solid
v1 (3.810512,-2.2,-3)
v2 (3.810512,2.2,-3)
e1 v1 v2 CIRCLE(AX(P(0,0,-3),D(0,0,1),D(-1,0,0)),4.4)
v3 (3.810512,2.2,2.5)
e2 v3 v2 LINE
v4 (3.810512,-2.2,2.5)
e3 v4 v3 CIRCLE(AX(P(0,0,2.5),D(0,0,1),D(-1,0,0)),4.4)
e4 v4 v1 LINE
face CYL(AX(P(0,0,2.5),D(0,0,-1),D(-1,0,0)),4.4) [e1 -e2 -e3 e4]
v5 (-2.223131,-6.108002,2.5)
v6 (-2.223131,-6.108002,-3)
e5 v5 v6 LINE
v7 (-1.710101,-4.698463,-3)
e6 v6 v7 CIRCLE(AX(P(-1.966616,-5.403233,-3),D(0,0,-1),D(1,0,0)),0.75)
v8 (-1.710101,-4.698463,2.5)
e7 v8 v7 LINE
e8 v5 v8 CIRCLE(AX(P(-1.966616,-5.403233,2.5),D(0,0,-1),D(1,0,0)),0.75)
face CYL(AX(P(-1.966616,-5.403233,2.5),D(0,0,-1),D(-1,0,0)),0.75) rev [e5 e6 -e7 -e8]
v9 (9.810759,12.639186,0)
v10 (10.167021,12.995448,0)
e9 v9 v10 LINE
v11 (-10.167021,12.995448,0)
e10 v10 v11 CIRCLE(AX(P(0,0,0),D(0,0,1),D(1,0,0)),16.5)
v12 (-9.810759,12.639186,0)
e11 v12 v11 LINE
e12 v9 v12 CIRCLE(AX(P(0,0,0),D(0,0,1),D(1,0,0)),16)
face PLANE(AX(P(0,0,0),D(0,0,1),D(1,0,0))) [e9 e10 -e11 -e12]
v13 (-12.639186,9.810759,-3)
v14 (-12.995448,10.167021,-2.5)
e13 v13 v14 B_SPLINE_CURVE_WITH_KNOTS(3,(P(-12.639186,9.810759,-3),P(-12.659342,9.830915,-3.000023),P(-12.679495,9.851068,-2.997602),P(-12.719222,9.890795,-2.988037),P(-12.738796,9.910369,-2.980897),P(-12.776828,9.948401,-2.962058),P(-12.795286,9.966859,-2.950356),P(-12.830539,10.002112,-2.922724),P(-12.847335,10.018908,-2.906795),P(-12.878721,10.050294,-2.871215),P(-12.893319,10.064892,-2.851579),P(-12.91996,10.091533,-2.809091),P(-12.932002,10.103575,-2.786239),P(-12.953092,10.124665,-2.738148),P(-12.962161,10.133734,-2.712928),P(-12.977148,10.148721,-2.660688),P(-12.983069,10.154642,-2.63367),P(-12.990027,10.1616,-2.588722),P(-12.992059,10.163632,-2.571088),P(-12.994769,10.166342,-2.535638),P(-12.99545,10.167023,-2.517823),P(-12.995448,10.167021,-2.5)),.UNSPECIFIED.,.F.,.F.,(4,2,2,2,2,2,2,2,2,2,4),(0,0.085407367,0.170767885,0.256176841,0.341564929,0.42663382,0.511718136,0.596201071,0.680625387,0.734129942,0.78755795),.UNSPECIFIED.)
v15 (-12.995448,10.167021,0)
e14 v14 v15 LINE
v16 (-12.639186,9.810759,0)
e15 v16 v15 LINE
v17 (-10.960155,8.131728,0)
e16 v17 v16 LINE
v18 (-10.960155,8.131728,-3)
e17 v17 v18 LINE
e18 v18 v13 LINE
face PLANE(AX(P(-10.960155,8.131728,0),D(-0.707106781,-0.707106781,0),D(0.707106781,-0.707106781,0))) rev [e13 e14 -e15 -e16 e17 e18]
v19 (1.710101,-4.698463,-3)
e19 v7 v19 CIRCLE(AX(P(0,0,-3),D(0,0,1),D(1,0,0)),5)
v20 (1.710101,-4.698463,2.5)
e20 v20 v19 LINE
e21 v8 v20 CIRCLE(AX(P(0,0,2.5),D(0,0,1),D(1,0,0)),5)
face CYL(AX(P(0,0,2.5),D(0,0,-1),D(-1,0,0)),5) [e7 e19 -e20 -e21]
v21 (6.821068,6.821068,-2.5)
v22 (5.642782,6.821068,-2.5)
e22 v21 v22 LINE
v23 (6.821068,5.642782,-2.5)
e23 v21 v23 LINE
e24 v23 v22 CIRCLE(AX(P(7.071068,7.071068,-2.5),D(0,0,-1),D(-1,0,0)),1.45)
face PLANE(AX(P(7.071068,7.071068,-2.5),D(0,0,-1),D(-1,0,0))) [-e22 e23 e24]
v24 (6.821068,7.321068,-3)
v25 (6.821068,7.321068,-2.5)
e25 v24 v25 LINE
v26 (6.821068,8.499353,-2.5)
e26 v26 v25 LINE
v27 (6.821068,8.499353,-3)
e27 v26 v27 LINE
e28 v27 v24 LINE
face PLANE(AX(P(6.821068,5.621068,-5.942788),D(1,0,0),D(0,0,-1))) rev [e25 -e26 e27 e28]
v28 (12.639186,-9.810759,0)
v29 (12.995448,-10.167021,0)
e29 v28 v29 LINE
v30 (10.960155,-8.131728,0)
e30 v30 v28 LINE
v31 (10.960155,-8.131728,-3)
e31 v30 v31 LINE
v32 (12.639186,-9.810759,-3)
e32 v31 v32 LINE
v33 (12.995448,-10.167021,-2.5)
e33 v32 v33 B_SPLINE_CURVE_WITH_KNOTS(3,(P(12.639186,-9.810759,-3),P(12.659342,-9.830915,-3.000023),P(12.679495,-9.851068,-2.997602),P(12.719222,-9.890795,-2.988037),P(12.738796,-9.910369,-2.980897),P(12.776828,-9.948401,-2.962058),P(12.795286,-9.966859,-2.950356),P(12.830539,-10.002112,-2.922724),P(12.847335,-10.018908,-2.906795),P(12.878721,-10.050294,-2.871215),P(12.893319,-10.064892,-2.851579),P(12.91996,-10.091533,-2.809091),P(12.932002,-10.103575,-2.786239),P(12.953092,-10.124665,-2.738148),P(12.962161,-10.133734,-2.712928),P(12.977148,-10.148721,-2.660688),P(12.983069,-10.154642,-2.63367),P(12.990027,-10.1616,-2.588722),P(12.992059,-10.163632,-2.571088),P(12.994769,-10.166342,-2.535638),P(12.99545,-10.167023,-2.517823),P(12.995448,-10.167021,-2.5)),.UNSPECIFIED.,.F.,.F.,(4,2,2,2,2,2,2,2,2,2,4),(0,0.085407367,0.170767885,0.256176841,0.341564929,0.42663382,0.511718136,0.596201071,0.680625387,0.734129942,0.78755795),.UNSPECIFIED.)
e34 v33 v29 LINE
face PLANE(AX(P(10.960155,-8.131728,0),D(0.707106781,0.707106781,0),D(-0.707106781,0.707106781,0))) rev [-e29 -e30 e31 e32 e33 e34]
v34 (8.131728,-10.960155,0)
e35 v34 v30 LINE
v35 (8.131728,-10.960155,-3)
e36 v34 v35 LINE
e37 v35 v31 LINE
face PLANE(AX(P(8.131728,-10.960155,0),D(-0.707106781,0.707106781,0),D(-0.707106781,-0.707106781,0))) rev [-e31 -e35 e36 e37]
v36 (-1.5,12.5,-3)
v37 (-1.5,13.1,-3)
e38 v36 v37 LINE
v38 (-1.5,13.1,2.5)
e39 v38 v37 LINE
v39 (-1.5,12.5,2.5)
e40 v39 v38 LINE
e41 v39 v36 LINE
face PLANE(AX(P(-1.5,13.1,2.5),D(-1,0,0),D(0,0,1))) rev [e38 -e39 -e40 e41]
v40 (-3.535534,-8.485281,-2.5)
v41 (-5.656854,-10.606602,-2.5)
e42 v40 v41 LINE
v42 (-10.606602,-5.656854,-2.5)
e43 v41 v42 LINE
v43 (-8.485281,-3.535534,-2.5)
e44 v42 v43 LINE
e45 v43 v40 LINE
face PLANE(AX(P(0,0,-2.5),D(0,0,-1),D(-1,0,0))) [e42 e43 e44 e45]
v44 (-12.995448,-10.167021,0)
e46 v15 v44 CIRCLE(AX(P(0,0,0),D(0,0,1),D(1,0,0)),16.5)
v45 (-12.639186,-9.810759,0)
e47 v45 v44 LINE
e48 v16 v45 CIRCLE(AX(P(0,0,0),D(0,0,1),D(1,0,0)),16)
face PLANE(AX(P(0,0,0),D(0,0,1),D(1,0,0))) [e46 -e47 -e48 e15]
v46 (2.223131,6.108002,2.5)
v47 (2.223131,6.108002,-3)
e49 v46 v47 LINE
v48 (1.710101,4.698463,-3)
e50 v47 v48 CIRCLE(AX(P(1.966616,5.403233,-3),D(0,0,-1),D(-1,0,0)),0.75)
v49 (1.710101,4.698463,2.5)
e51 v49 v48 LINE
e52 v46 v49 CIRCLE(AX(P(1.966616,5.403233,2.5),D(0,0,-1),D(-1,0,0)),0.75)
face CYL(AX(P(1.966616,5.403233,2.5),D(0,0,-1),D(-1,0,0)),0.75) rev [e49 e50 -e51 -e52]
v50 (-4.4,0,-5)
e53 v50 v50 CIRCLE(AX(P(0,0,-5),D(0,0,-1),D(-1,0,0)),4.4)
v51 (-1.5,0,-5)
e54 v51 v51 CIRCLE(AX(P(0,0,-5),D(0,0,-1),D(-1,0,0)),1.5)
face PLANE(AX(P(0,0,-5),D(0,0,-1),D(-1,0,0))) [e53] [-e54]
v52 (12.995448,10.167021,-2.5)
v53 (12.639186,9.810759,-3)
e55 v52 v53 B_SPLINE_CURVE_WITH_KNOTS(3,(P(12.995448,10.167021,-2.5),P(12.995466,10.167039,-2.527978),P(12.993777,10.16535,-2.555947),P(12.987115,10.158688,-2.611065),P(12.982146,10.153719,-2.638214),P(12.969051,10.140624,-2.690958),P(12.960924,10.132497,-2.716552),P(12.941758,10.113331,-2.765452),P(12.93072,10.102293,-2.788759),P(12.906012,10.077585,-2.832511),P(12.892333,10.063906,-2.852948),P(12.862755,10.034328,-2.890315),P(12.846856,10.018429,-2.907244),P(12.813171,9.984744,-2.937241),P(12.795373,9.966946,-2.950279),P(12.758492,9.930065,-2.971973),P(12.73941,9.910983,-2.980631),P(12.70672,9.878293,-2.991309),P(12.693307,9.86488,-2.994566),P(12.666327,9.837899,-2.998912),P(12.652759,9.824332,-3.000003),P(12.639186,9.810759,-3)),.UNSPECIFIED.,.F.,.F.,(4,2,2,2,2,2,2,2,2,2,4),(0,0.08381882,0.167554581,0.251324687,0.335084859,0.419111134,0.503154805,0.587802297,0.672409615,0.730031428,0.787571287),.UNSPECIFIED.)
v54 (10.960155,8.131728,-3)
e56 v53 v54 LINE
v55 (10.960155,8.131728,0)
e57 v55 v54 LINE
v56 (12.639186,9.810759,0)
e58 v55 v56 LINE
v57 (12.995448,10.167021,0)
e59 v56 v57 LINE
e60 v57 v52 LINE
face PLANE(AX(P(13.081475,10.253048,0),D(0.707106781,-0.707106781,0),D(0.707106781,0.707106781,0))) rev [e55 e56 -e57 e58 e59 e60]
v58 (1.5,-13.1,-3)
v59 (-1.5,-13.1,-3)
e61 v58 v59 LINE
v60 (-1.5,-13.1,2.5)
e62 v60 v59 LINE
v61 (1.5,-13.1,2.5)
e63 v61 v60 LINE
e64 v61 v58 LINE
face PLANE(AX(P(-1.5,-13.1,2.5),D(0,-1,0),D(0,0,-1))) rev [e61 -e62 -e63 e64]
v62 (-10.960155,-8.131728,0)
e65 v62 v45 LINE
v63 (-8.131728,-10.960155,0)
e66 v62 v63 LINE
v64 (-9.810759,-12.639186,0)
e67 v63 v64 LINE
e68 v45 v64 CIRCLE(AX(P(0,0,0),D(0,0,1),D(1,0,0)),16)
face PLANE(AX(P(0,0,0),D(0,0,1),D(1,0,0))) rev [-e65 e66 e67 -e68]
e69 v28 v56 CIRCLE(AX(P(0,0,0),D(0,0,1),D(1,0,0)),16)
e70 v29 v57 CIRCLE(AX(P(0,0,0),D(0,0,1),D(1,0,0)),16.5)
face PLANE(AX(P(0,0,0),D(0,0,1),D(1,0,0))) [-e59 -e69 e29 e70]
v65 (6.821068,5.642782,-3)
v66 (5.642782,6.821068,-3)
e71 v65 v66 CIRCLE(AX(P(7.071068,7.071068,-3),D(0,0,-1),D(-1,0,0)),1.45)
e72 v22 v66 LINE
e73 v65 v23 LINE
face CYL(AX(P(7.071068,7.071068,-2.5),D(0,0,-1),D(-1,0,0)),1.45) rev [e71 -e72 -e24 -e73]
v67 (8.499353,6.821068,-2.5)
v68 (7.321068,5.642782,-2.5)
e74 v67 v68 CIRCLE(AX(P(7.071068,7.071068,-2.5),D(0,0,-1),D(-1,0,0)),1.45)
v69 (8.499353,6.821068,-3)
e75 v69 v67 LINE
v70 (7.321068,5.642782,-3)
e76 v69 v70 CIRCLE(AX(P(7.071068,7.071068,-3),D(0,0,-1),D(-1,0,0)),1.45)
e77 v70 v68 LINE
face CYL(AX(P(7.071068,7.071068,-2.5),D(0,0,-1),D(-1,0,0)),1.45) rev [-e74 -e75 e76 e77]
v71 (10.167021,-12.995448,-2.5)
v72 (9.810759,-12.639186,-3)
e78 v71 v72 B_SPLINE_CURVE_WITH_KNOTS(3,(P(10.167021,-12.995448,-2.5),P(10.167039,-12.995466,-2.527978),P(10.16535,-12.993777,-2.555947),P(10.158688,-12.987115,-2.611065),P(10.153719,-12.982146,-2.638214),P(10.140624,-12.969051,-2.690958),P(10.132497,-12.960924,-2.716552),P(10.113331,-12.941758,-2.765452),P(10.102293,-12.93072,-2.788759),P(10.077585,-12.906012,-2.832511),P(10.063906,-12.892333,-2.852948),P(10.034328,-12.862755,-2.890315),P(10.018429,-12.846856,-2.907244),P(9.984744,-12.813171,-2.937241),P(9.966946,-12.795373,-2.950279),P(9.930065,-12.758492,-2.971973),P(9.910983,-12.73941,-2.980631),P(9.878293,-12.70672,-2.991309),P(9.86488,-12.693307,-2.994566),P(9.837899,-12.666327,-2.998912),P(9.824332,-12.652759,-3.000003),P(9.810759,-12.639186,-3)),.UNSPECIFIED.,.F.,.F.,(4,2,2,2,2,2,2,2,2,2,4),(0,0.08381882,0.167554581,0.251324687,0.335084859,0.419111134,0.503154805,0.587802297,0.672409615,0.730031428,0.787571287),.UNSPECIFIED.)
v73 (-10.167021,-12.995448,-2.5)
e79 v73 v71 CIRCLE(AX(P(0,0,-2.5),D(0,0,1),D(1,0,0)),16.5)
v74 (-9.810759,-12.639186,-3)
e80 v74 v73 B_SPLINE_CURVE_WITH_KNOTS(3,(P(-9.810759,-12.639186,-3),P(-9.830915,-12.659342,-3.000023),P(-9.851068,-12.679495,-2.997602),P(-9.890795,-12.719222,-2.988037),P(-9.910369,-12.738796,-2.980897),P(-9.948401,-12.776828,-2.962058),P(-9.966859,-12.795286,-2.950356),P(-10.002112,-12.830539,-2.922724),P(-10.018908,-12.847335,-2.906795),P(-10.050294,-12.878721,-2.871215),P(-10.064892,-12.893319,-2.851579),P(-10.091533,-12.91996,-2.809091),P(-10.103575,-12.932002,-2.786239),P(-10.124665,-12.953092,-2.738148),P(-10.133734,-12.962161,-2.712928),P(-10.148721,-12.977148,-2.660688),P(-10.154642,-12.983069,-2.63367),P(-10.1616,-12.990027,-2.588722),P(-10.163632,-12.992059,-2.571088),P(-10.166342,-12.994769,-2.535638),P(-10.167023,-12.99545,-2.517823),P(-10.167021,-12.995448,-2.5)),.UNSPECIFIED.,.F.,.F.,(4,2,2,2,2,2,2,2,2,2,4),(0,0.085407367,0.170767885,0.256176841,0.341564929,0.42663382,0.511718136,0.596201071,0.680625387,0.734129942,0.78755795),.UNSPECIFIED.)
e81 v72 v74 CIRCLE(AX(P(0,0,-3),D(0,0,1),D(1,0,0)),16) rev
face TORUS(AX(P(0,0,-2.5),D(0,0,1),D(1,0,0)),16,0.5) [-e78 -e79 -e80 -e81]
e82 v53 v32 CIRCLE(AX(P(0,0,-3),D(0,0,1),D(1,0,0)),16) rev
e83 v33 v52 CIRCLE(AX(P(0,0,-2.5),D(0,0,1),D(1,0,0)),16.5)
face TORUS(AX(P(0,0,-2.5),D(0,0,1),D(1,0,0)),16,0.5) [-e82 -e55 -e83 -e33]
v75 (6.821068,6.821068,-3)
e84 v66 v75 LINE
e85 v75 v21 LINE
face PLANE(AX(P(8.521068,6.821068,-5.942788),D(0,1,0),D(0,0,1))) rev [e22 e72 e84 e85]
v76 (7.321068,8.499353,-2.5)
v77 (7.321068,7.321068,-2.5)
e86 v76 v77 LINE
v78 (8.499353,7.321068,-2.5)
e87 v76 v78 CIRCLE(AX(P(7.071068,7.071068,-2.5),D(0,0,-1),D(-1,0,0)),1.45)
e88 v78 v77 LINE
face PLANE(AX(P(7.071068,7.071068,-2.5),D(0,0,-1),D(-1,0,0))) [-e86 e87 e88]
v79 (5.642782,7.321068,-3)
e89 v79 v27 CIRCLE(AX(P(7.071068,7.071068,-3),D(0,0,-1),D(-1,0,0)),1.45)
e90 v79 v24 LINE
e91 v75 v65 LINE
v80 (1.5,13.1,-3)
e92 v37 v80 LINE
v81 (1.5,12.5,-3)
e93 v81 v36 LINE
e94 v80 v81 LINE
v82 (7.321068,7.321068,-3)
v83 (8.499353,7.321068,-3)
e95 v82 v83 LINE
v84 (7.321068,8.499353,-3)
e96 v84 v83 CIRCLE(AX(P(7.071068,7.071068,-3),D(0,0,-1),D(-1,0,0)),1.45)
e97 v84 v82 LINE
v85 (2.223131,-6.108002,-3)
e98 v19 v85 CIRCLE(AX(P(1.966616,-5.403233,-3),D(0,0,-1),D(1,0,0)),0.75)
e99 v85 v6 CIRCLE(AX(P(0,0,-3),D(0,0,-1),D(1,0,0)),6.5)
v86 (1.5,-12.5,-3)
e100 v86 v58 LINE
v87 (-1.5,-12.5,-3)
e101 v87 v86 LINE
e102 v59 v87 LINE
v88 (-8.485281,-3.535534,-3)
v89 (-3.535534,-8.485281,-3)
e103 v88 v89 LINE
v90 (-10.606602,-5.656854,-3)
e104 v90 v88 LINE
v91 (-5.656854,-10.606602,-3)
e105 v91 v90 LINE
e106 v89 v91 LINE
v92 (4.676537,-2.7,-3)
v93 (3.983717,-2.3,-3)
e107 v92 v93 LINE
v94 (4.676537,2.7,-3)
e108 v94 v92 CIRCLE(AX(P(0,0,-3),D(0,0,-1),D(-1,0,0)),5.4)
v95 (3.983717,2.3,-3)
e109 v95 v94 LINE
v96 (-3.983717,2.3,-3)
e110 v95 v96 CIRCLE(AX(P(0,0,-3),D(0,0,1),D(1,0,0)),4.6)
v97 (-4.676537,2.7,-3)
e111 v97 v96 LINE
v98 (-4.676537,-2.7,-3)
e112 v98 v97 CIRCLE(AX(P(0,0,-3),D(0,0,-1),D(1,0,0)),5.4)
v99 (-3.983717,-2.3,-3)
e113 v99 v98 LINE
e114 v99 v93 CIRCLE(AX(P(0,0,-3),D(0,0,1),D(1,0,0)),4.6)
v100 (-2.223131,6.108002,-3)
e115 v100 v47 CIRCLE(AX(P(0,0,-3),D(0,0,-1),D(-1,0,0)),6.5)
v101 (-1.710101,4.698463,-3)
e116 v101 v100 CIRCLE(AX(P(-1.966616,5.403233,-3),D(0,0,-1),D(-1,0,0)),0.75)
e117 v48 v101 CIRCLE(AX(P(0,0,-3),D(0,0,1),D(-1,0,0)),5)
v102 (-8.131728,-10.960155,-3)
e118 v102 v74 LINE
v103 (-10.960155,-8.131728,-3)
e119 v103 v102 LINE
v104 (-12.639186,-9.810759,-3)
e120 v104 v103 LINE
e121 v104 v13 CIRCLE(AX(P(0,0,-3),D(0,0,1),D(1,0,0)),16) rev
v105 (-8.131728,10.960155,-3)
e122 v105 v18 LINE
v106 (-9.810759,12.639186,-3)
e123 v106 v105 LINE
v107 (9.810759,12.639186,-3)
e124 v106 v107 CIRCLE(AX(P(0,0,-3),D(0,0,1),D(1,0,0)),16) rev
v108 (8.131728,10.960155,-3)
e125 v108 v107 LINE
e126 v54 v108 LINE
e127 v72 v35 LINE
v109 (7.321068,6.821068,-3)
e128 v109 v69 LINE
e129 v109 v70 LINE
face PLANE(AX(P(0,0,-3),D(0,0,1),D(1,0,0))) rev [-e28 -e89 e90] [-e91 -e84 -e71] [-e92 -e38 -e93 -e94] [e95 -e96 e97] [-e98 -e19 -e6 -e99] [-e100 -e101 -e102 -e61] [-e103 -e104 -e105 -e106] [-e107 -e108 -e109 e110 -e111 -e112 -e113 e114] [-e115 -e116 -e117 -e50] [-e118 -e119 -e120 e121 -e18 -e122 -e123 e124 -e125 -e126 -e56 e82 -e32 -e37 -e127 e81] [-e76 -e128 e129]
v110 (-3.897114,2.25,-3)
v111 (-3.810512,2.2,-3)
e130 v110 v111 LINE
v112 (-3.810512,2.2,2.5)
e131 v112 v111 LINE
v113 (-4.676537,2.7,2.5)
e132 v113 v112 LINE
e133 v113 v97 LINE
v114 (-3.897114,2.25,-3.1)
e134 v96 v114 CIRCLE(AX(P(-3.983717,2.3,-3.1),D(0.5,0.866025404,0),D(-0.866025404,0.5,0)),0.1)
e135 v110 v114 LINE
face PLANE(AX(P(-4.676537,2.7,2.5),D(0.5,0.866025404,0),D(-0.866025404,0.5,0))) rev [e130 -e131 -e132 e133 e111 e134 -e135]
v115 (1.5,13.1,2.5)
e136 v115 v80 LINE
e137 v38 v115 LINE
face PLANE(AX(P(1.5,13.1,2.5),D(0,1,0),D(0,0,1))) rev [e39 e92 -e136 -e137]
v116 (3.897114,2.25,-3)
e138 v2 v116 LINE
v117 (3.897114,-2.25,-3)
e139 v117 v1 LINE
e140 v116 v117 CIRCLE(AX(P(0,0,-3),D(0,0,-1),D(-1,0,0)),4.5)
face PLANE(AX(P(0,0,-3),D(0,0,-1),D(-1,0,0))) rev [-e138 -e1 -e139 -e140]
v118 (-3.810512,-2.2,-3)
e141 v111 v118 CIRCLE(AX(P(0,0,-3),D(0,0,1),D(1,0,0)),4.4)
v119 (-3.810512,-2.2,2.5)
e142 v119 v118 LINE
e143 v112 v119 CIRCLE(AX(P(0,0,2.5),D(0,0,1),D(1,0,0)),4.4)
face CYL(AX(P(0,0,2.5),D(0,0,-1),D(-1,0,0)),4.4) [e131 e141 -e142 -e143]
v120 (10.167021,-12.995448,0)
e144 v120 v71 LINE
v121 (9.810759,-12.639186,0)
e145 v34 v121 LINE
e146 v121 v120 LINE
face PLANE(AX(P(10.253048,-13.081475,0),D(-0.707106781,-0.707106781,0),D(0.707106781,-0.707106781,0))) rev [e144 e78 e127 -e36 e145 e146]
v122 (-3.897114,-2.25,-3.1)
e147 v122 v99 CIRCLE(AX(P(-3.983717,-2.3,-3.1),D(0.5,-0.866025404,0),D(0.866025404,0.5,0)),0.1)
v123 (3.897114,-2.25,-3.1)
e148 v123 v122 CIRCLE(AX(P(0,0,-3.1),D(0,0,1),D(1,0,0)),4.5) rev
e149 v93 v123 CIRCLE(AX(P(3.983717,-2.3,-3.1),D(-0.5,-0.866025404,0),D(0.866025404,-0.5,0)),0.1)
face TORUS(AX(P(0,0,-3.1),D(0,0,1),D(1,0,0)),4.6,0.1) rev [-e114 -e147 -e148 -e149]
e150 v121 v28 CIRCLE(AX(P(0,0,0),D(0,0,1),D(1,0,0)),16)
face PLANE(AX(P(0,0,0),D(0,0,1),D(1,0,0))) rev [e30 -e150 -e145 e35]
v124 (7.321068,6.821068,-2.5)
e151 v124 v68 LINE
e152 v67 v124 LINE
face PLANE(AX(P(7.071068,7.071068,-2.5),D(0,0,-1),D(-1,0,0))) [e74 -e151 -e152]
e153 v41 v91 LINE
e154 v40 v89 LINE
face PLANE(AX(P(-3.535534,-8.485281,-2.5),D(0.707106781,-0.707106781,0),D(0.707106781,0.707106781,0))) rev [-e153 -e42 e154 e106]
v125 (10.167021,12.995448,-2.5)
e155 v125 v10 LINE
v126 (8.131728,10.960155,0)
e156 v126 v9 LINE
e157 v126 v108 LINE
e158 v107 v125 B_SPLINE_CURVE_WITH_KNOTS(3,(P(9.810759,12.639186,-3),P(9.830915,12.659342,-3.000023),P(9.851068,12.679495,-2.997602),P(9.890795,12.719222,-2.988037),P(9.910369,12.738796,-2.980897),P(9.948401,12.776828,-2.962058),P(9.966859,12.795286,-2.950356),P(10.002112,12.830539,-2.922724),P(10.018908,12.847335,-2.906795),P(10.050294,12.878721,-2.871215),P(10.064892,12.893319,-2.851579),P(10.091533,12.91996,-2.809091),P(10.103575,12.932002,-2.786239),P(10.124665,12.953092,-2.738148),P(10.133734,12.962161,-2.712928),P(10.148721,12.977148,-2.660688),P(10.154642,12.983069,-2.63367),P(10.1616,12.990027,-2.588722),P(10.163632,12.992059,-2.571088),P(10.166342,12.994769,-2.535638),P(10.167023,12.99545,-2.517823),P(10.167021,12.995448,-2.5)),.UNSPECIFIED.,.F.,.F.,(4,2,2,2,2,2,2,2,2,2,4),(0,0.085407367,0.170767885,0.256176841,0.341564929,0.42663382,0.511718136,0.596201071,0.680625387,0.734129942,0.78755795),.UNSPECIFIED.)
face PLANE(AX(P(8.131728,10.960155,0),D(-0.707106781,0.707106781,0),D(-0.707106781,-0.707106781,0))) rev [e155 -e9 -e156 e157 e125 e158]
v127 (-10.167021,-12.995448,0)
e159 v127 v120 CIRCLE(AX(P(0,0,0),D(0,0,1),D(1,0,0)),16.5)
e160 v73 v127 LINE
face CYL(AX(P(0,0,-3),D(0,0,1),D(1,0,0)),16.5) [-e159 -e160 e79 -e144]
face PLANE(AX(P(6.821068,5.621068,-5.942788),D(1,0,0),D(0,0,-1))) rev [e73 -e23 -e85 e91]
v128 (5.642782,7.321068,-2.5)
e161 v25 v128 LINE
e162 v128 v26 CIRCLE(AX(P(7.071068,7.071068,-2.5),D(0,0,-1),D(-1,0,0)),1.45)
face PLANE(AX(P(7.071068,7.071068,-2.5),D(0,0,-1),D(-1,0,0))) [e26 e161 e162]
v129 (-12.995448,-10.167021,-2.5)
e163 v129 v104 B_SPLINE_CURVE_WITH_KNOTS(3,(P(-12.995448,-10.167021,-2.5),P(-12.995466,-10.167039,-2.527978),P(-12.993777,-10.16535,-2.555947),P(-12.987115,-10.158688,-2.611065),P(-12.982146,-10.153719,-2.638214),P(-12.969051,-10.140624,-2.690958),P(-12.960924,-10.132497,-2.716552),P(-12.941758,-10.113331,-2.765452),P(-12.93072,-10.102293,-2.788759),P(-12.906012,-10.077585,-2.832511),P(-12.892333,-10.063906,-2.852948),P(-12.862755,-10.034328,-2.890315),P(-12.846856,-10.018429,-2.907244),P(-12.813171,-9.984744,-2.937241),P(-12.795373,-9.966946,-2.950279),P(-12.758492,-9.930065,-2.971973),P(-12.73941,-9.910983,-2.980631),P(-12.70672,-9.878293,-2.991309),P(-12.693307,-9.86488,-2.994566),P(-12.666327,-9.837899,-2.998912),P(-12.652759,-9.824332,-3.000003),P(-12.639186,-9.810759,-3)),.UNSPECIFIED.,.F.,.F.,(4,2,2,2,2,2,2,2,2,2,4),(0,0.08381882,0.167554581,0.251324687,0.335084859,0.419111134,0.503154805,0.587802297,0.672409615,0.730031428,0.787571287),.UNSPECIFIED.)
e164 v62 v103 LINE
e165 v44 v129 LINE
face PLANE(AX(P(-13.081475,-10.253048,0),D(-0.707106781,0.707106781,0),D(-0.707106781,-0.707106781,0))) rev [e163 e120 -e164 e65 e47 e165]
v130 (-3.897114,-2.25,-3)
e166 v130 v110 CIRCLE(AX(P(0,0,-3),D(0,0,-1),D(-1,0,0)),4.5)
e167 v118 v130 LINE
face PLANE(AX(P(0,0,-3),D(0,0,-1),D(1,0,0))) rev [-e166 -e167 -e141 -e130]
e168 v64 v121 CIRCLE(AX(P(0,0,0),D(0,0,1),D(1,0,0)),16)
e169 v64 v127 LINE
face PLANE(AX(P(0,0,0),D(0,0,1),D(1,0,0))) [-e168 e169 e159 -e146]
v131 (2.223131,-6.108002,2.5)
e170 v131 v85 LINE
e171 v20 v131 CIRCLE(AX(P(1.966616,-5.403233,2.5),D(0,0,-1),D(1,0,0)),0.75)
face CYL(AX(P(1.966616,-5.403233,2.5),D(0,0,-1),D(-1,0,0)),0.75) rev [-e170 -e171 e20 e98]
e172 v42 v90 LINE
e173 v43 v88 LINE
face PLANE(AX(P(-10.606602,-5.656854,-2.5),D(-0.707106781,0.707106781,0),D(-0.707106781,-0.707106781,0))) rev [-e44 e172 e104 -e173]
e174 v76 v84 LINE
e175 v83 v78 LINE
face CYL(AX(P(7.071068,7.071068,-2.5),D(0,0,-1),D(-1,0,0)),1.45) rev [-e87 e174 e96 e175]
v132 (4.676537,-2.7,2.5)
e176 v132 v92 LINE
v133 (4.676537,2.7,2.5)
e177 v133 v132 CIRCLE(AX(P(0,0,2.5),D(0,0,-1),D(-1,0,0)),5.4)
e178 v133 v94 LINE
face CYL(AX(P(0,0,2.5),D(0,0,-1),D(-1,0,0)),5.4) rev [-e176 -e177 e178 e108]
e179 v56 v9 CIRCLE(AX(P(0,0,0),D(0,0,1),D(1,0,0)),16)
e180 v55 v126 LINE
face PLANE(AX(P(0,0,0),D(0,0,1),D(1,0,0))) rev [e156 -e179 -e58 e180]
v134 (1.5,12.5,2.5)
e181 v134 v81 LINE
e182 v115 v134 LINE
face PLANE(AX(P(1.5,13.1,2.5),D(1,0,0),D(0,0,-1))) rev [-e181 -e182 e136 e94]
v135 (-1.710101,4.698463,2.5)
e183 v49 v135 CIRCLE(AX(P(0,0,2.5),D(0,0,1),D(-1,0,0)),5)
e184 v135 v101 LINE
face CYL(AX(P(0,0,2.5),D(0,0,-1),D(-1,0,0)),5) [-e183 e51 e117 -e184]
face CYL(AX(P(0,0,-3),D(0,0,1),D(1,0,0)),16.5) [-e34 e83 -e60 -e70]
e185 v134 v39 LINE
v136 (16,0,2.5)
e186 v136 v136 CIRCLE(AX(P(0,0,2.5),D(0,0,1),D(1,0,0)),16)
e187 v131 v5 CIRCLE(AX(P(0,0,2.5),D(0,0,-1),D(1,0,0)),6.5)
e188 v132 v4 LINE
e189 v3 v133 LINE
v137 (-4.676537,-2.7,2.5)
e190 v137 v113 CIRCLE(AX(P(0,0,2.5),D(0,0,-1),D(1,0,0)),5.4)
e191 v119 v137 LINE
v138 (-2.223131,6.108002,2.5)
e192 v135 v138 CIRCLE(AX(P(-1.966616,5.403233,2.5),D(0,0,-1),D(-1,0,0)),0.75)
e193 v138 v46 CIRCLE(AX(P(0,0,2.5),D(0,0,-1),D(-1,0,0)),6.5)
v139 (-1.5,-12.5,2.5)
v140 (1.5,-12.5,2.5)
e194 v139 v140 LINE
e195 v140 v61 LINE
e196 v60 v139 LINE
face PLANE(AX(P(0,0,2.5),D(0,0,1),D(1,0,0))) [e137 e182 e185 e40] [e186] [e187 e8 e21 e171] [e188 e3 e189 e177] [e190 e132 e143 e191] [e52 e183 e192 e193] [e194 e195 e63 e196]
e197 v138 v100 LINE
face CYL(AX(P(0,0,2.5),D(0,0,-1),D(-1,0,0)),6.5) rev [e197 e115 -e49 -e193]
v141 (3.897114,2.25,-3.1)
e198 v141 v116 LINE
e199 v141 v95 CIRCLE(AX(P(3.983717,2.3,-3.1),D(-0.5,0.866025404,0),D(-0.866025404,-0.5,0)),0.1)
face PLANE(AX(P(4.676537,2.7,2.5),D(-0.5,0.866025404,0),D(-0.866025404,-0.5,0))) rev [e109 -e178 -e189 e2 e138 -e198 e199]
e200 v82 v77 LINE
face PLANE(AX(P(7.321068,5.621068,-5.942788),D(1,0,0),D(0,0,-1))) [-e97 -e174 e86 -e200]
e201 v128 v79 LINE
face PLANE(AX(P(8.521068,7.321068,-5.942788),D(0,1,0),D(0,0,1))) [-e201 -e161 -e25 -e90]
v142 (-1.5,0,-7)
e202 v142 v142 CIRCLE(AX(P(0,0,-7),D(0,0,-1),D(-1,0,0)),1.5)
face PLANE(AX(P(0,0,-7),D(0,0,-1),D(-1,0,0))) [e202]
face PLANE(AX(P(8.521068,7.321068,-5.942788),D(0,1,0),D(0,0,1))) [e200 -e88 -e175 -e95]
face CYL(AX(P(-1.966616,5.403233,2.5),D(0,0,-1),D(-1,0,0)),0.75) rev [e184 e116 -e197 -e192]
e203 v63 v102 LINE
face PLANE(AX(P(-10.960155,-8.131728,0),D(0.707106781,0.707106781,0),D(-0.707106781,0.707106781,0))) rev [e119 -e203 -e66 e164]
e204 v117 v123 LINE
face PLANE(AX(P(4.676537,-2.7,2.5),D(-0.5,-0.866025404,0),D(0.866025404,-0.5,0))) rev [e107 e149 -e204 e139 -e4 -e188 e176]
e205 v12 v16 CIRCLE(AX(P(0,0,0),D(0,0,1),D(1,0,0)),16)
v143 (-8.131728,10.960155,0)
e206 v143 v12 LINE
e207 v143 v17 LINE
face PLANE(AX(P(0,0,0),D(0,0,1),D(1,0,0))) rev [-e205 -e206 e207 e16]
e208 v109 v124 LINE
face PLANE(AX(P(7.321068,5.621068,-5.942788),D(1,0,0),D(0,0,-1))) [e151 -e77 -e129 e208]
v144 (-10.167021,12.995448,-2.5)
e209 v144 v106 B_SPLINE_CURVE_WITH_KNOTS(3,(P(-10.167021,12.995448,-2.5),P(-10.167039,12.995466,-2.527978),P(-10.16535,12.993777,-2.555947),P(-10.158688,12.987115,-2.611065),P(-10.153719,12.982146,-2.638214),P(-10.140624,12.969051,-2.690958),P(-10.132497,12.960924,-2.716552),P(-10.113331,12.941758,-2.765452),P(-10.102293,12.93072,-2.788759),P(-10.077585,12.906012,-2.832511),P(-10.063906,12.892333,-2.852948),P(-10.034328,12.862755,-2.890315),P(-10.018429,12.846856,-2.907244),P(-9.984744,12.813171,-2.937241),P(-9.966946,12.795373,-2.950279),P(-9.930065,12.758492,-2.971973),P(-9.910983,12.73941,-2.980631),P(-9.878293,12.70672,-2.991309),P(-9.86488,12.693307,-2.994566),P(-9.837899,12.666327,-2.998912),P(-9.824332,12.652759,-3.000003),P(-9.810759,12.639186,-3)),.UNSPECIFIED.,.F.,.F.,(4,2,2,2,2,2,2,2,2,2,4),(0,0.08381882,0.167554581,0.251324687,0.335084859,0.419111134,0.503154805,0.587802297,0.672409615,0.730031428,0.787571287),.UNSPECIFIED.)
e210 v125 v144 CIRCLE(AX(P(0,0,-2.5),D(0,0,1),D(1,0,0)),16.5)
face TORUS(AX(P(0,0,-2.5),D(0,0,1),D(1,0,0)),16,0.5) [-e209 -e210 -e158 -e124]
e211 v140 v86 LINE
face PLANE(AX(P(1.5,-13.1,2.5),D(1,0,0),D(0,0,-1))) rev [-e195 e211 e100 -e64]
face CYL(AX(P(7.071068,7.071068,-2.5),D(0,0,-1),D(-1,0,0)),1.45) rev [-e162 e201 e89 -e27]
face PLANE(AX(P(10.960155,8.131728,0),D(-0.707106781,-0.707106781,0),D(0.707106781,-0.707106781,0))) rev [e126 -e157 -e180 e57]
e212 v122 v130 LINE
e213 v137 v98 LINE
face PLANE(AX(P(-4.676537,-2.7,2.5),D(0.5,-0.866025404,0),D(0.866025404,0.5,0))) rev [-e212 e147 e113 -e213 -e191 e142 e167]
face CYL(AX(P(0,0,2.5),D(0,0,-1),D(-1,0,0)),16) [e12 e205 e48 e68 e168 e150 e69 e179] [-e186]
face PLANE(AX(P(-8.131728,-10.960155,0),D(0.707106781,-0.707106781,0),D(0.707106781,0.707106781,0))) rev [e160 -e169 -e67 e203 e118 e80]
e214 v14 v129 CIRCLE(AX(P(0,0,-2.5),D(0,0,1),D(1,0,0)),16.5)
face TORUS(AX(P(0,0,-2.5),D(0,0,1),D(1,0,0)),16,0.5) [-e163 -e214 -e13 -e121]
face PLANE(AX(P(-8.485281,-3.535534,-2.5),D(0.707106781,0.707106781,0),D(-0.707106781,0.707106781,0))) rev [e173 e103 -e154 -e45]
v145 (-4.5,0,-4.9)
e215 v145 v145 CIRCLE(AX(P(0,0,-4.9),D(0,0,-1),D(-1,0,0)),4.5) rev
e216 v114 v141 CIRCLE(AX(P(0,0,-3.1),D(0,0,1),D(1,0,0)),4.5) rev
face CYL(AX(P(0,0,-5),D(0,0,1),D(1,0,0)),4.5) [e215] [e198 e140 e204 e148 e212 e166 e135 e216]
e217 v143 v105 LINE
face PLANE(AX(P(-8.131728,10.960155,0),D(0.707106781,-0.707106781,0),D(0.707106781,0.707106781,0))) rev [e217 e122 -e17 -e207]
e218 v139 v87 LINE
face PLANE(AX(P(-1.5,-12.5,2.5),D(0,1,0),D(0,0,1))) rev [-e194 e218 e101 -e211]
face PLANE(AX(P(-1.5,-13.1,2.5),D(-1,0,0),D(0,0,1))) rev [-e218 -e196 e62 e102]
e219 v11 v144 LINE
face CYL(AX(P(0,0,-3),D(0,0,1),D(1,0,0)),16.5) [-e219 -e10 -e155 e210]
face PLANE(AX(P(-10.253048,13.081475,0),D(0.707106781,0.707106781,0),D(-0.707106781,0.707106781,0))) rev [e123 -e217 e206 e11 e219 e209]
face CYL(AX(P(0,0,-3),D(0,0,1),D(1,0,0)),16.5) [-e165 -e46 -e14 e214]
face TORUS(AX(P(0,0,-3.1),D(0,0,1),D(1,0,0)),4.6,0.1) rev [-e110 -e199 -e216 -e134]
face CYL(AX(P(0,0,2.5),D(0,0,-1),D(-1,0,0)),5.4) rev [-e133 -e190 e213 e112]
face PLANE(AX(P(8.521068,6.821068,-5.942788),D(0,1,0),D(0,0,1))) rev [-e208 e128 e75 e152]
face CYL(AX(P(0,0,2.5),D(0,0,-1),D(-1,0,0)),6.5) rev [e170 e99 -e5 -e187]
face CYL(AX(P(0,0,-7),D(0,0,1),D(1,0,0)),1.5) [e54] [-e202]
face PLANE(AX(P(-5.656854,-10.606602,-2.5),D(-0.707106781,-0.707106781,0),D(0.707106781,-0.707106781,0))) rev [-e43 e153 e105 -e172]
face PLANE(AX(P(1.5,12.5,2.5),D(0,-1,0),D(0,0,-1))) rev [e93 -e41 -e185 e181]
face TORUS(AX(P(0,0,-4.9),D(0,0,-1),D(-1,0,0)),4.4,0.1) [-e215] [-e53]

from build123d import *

# Parameters (mm, degrees)
SKETCH1_R           = 16.5
BOSS_EXTRUDE1_DEPTH = 3
SKETCH2_R           = 4.5
BOSS_EXTRUDE2_DEPTH = 2
CUT_EXTRUDE1_DEPTH  = 24.526580712
CIRPATTERN1_COUNT   = 4
SKETCH4_R           = 16
BOSS_EXTRUDE3_DEPTH = 2.5
CUT_EXTRUDE2_DEPTH  = 24.973944189
CIRPATTERN2_COUNT   = 2
CUT_EXTRUDE3_DEPTH  = 24.973944189
CIRPATTERN3_COUNT   = 2
SKETCH8_R           = 1.45
CUT_EXTRUDE4_DEPTH  = 0.5
SKETCH9_W           = 0.5
SKETCH9_H           = 2.9
EXTRUDE_THIN1_DEPTH = 0.5
SKETCH10_W          = 2.9
SKETCH10_H          = 0.5
EXTRUDE_THIN2_DEPTH = 0.5
SKETCH11_W          = 3
SKETCH11_H          = 0.6
CUT_EXTRUDE5_DEPTH  = 24.973944189
CIRPATTERN4_COUNT   = 2
FILLET1_R           = 0.1
FILLET2_R           = 0.5
SKETCH_1_R          = 1.5
EXTRUDE_1_DEPTH     = 2


with BuildPart() as part:
    # Sketch1 → Boss-Extrude1 (new body)
    with BuildSketch(Plane.XY):
        Circle(SKETCH1_R)
    extrude(amount=-BOSS_EXTRUDE1_DEPTH)

    # Sketch2 → Boss-Extrude2 (add)
    with BuildSketch(Plane(origin=(0, 0, -3), x_dir=(-1, 0, 0), z_dir=(0, 0, -1))):
        Circle(SKETCH2_R)
    extrude(amount=BOSS_EXTRUDE2_DEPTH)

    # Sketch3 → Cut-Extrude1 (cut, through all)
    with BuildSketch(Plane(origin=(0, 0, -3), x_dir=(-1, 0, 0), z_dir=(0, 0, -1))):
        Polygon((10.253048327, 13.081475452), (8.131727984, 10.960155108), (10.960155108, 8.131727984), (13.081475452, 10.253048327), align=None)
    cut_extrude1 = extrude(amount=-CUT_EXTRUDE1_DEPTH, mode=Mode.SUBTRACT)

    # CirPattern1: Cut-Extrude1 ×4 about axis
    cirpattern1_axis = Axis((0, 0, 0), (0, 0, 1))
    for i in range(1, CIRPATTERN1_COUNT):
        add(cut_extrude1.rotate(cirpattern1_axis, i * 360 / CIRPATTERN1_COUNT), mode=Mode.SUBTRACT)

    # Sketch4 → Boss-Extrude3 (add)
    with BuildSketch(Plane.XY):
        with Locations(Location((0, 0, 0), (0, 0, 217.819244219))):
            Circle(SKETCH4_R)
    extrude(amount=BOSS_EXTRUDE3_DEPTH)

    # Sketch6 → Cut-Extrude2 (cut, through all)
    with BuildSketch(Plane(origin=(0, 0, -3), x_dir=(-1, 0, 0), z_dir=(0, 0, -1))):
        with BuildLine():
            Line((-4.67653718, 2.7), (-3.810511777, 2.2))
            ThreePointArc((-3.810511777, 2.2), (-4.4, 0), (-3.810511777, -2.2))
            Line((-3.810511777, -2.2), (-4.67653718, -2.7))
            ThreePointArc((-4.67653718, -2.7), (-5.4, 0), (-4.67653718, 2.7))
        make_face()
    cut_extrude2 = extrude(amount=-CUT_EXTRUDE2_DEPTH, mode=Mode.SUBTRACT)

    # CirPattern2: Cut-Extrude2 ×2 about axis
    cirpattern2_axis = Axis((0, 0, 0), (0, 0, 1))
    for i in range(1, CIRPATTERN2_COUNT):
        add(cut_extrude2.rotate(cirpattern2_axis, i * 360 / CIRPATTERN2_COUNT), mode=Mode.SUBTRACT)

    # Sketch7 → Cut-Extrude3 (cut, through all)
    with BuildSketch(Plane(origin=(0, 0, -3), x_dir=(-1, 0, 0), z_dir=(0, 0, -1))):
        with BuildLine():
            ThreePointArc((2.223130932, 6.108002035), (0, 6.5), (-2.223130932, 6.108002035))
            ThreePointArc((-2.223130932, 6.108002035), (-2.67138529, 5.146717462), (-1.710100717, 4.698463104))
            ThreePointArc((-1.710100717, 4.698463104), (0, 5), (1.710100717, 4.698463104))
            ThreePointArc((1.710100717, 4.698463104), (2.67138529, 5.146717462), (2.223130932, 6.108002035))
        make_face()
    cut_extrude3 = extrude(amount=-CUT_EXTRUDE3_DEPTH, mode=Mode.SUBTRACT)

    # CirPattern3: Cut-Extrude3 ×2 about axis
    cirpattern3_axis = Axis((0, 0, 0), (0, 0, 1))
    for i in range(1, CIRPATTERN3_COUNT):
        add(cut_extrude3.rotate(cirpattern3_axis, i * 360 / CIRPATTERN3_COUNT), mode=Mode.SUBTRACT)

    # Sketch8 → Cut-Extrude4 (cut)
    with BuildSketch(Plane(origin=(0, 0, -3), x_dir=(-1, 0, 0), z_dir=(0, 0, -1))):
        with Locations((-7.071067812, 7.071067812)):
            Circle(SKETCH8_R)
        Polygon((8.485281374, -3.535533906), (3.535533906, -8.485281374), (5.656854249, -10.606601718), (10.606601718, -5.656854249), align=None)
    extrude(amount=-CUT_EXTRUDE4_DEPTH, mode=Mode.SUBTRACT)

    # Sketch9 → Extrude-Thin1 (add)
    with BuildSketch(Plane(origin=(0, 0, -2.5), x_dir=(-1, 0, 0), z_dir=(0, 0, -1))):
        with Locations((-7.071067812, 7.071067812)):
            Rectangle(SKETCH9_W, SKETCH9_H)
    extrude(amount=EXTRUDE_THIN1_DEPTH)

    # Sketch10 → Extrude-Thin2 (add)
    with BuildSketch(Plane(origin=(0, 0, -2.5), x_dir=(-1, 0, 0), z_dir=(0, 0, -1))):
        with Locations((-7.071067812, 7.071067812)):
            Rectangle(SKETCH10_W, SKETCH10_H)
    extrude(amount=EXTRUDE_THIN2_DEPTH)

    # Sketch11 → Cut-Extrude5 (cut, through all)
    with BuildSketch(Plane(origin=(0, 0, -3), x_dir=(-1, 0, 0), z_dir=(0, 0, -1))):
        with Locations((0, 12.8)):
            Rectangle(SKETCH11_W, SKETCH11_H)
    cut_extrude5 = extrude(amount=-CUT_EXTRUDE5_DEPTH, mode=Mode.SUBTRACT)

    # CirPattern4: Cut-Extrude5 ×2 about axis
    cirpattern4_axis = Axis((0, 0, 0), (0, 0, 1))
    for i in range(1, CIRPATTERN4_COUNT):
        add(cut_extrude5.rotate(cirpattern4_axis, i * 360 / CIRPATTERN4_COUNT), mode=Mode.SUBTRACT)

    # Fillet1
    # the kernel refuses this fillet: 0.1 mm, written as the material it adds along each edge
    with BuildSketch(Plane(origin=(0, 0, -3), x_dir=(0.86602540378442, -0.5000000000000324, 0), z_dir=(0.5000000000000324, 0.86602540378442, 0))) as fillet1_piece_1:
        with BuildLine():
            CenterArc((4.5 + FILLET1_R, FILLET1_R), FILLET1_R, 180, 90)
            Line((4.5, FILLET1_R), (4.5, 0))
            Line((4.5, 0), (4.5 + FILLET1_R, 0))
        make_face()
    revolve(axis=Axis((0, 0, -3), (0, 0, -1)), revolution_arc=120)
    with BuildSketch(Plane(origin=(0, 0, -3), x_dir=(-0.8660254037844196, 0.500000000000033, 0), z_dir=(-0.500000000000033, -0.8660254037844196, 0))) as fillet1_piece_2:
        with BuildLine():
            CenterArc((4.5 + FILLET1_R, FILLET1_R), FILLET1_R, 180, 90)
            Line((4.5, FILLET1_R), (4.5, 0))
            Line((4.5, 0), (4.5 + FILLET1_R, 0))
        make_face()
    revolve(axis=Axis((0, 0, -3), (0, 0, -1)), revolution_arc=120)
    # the kernel refuses this fillet: 0.1 mm, written as the material it takes off along each edge
    with BuildSketch(Plane(origin=(0, 0, -5), x_dir=(-1, 0, 0), z_dir=(0, -1, 0))) as fillet1_2_piece_1:
        with BuildLine():
            CenterArc((4.5 - FILLET1_R, -FILLET1_R), FILLET1_R, 0, 90)
            Line((4.5 - FILLET1_R, 0), (4.5, 0))
            Line((4.5, 0), (4.5, -FILLET1_R))
        make_face()
    revolve(axis=Axis((0, 0, -5), (0, 0, -1)), mode=Mode.SUBTRACT)

    # Fillet2
    fillet2_edges = [part.edges().sort_by_distance(p)[0] for p in [
        (-16.5, 0, -3),
        (0, -16.5, -3),
        (16.5, 0, -3),
        (0, 16.5, -3),
    ]]
    fillet(fillet2_edges, radius=FILLET2_R)

    # Эскиз1 → Бобышка-Вытянуть1 (add)
    with BuildSketch(Plane(origin=(0, 0, -5), x_dir=(-1, 0, 0), z_dir=(0, 0, -1))):
        Circle(SKETCH_1_R)
    extrude(amount=EXTRUDE_1_DEPTH)


solid = part.part
